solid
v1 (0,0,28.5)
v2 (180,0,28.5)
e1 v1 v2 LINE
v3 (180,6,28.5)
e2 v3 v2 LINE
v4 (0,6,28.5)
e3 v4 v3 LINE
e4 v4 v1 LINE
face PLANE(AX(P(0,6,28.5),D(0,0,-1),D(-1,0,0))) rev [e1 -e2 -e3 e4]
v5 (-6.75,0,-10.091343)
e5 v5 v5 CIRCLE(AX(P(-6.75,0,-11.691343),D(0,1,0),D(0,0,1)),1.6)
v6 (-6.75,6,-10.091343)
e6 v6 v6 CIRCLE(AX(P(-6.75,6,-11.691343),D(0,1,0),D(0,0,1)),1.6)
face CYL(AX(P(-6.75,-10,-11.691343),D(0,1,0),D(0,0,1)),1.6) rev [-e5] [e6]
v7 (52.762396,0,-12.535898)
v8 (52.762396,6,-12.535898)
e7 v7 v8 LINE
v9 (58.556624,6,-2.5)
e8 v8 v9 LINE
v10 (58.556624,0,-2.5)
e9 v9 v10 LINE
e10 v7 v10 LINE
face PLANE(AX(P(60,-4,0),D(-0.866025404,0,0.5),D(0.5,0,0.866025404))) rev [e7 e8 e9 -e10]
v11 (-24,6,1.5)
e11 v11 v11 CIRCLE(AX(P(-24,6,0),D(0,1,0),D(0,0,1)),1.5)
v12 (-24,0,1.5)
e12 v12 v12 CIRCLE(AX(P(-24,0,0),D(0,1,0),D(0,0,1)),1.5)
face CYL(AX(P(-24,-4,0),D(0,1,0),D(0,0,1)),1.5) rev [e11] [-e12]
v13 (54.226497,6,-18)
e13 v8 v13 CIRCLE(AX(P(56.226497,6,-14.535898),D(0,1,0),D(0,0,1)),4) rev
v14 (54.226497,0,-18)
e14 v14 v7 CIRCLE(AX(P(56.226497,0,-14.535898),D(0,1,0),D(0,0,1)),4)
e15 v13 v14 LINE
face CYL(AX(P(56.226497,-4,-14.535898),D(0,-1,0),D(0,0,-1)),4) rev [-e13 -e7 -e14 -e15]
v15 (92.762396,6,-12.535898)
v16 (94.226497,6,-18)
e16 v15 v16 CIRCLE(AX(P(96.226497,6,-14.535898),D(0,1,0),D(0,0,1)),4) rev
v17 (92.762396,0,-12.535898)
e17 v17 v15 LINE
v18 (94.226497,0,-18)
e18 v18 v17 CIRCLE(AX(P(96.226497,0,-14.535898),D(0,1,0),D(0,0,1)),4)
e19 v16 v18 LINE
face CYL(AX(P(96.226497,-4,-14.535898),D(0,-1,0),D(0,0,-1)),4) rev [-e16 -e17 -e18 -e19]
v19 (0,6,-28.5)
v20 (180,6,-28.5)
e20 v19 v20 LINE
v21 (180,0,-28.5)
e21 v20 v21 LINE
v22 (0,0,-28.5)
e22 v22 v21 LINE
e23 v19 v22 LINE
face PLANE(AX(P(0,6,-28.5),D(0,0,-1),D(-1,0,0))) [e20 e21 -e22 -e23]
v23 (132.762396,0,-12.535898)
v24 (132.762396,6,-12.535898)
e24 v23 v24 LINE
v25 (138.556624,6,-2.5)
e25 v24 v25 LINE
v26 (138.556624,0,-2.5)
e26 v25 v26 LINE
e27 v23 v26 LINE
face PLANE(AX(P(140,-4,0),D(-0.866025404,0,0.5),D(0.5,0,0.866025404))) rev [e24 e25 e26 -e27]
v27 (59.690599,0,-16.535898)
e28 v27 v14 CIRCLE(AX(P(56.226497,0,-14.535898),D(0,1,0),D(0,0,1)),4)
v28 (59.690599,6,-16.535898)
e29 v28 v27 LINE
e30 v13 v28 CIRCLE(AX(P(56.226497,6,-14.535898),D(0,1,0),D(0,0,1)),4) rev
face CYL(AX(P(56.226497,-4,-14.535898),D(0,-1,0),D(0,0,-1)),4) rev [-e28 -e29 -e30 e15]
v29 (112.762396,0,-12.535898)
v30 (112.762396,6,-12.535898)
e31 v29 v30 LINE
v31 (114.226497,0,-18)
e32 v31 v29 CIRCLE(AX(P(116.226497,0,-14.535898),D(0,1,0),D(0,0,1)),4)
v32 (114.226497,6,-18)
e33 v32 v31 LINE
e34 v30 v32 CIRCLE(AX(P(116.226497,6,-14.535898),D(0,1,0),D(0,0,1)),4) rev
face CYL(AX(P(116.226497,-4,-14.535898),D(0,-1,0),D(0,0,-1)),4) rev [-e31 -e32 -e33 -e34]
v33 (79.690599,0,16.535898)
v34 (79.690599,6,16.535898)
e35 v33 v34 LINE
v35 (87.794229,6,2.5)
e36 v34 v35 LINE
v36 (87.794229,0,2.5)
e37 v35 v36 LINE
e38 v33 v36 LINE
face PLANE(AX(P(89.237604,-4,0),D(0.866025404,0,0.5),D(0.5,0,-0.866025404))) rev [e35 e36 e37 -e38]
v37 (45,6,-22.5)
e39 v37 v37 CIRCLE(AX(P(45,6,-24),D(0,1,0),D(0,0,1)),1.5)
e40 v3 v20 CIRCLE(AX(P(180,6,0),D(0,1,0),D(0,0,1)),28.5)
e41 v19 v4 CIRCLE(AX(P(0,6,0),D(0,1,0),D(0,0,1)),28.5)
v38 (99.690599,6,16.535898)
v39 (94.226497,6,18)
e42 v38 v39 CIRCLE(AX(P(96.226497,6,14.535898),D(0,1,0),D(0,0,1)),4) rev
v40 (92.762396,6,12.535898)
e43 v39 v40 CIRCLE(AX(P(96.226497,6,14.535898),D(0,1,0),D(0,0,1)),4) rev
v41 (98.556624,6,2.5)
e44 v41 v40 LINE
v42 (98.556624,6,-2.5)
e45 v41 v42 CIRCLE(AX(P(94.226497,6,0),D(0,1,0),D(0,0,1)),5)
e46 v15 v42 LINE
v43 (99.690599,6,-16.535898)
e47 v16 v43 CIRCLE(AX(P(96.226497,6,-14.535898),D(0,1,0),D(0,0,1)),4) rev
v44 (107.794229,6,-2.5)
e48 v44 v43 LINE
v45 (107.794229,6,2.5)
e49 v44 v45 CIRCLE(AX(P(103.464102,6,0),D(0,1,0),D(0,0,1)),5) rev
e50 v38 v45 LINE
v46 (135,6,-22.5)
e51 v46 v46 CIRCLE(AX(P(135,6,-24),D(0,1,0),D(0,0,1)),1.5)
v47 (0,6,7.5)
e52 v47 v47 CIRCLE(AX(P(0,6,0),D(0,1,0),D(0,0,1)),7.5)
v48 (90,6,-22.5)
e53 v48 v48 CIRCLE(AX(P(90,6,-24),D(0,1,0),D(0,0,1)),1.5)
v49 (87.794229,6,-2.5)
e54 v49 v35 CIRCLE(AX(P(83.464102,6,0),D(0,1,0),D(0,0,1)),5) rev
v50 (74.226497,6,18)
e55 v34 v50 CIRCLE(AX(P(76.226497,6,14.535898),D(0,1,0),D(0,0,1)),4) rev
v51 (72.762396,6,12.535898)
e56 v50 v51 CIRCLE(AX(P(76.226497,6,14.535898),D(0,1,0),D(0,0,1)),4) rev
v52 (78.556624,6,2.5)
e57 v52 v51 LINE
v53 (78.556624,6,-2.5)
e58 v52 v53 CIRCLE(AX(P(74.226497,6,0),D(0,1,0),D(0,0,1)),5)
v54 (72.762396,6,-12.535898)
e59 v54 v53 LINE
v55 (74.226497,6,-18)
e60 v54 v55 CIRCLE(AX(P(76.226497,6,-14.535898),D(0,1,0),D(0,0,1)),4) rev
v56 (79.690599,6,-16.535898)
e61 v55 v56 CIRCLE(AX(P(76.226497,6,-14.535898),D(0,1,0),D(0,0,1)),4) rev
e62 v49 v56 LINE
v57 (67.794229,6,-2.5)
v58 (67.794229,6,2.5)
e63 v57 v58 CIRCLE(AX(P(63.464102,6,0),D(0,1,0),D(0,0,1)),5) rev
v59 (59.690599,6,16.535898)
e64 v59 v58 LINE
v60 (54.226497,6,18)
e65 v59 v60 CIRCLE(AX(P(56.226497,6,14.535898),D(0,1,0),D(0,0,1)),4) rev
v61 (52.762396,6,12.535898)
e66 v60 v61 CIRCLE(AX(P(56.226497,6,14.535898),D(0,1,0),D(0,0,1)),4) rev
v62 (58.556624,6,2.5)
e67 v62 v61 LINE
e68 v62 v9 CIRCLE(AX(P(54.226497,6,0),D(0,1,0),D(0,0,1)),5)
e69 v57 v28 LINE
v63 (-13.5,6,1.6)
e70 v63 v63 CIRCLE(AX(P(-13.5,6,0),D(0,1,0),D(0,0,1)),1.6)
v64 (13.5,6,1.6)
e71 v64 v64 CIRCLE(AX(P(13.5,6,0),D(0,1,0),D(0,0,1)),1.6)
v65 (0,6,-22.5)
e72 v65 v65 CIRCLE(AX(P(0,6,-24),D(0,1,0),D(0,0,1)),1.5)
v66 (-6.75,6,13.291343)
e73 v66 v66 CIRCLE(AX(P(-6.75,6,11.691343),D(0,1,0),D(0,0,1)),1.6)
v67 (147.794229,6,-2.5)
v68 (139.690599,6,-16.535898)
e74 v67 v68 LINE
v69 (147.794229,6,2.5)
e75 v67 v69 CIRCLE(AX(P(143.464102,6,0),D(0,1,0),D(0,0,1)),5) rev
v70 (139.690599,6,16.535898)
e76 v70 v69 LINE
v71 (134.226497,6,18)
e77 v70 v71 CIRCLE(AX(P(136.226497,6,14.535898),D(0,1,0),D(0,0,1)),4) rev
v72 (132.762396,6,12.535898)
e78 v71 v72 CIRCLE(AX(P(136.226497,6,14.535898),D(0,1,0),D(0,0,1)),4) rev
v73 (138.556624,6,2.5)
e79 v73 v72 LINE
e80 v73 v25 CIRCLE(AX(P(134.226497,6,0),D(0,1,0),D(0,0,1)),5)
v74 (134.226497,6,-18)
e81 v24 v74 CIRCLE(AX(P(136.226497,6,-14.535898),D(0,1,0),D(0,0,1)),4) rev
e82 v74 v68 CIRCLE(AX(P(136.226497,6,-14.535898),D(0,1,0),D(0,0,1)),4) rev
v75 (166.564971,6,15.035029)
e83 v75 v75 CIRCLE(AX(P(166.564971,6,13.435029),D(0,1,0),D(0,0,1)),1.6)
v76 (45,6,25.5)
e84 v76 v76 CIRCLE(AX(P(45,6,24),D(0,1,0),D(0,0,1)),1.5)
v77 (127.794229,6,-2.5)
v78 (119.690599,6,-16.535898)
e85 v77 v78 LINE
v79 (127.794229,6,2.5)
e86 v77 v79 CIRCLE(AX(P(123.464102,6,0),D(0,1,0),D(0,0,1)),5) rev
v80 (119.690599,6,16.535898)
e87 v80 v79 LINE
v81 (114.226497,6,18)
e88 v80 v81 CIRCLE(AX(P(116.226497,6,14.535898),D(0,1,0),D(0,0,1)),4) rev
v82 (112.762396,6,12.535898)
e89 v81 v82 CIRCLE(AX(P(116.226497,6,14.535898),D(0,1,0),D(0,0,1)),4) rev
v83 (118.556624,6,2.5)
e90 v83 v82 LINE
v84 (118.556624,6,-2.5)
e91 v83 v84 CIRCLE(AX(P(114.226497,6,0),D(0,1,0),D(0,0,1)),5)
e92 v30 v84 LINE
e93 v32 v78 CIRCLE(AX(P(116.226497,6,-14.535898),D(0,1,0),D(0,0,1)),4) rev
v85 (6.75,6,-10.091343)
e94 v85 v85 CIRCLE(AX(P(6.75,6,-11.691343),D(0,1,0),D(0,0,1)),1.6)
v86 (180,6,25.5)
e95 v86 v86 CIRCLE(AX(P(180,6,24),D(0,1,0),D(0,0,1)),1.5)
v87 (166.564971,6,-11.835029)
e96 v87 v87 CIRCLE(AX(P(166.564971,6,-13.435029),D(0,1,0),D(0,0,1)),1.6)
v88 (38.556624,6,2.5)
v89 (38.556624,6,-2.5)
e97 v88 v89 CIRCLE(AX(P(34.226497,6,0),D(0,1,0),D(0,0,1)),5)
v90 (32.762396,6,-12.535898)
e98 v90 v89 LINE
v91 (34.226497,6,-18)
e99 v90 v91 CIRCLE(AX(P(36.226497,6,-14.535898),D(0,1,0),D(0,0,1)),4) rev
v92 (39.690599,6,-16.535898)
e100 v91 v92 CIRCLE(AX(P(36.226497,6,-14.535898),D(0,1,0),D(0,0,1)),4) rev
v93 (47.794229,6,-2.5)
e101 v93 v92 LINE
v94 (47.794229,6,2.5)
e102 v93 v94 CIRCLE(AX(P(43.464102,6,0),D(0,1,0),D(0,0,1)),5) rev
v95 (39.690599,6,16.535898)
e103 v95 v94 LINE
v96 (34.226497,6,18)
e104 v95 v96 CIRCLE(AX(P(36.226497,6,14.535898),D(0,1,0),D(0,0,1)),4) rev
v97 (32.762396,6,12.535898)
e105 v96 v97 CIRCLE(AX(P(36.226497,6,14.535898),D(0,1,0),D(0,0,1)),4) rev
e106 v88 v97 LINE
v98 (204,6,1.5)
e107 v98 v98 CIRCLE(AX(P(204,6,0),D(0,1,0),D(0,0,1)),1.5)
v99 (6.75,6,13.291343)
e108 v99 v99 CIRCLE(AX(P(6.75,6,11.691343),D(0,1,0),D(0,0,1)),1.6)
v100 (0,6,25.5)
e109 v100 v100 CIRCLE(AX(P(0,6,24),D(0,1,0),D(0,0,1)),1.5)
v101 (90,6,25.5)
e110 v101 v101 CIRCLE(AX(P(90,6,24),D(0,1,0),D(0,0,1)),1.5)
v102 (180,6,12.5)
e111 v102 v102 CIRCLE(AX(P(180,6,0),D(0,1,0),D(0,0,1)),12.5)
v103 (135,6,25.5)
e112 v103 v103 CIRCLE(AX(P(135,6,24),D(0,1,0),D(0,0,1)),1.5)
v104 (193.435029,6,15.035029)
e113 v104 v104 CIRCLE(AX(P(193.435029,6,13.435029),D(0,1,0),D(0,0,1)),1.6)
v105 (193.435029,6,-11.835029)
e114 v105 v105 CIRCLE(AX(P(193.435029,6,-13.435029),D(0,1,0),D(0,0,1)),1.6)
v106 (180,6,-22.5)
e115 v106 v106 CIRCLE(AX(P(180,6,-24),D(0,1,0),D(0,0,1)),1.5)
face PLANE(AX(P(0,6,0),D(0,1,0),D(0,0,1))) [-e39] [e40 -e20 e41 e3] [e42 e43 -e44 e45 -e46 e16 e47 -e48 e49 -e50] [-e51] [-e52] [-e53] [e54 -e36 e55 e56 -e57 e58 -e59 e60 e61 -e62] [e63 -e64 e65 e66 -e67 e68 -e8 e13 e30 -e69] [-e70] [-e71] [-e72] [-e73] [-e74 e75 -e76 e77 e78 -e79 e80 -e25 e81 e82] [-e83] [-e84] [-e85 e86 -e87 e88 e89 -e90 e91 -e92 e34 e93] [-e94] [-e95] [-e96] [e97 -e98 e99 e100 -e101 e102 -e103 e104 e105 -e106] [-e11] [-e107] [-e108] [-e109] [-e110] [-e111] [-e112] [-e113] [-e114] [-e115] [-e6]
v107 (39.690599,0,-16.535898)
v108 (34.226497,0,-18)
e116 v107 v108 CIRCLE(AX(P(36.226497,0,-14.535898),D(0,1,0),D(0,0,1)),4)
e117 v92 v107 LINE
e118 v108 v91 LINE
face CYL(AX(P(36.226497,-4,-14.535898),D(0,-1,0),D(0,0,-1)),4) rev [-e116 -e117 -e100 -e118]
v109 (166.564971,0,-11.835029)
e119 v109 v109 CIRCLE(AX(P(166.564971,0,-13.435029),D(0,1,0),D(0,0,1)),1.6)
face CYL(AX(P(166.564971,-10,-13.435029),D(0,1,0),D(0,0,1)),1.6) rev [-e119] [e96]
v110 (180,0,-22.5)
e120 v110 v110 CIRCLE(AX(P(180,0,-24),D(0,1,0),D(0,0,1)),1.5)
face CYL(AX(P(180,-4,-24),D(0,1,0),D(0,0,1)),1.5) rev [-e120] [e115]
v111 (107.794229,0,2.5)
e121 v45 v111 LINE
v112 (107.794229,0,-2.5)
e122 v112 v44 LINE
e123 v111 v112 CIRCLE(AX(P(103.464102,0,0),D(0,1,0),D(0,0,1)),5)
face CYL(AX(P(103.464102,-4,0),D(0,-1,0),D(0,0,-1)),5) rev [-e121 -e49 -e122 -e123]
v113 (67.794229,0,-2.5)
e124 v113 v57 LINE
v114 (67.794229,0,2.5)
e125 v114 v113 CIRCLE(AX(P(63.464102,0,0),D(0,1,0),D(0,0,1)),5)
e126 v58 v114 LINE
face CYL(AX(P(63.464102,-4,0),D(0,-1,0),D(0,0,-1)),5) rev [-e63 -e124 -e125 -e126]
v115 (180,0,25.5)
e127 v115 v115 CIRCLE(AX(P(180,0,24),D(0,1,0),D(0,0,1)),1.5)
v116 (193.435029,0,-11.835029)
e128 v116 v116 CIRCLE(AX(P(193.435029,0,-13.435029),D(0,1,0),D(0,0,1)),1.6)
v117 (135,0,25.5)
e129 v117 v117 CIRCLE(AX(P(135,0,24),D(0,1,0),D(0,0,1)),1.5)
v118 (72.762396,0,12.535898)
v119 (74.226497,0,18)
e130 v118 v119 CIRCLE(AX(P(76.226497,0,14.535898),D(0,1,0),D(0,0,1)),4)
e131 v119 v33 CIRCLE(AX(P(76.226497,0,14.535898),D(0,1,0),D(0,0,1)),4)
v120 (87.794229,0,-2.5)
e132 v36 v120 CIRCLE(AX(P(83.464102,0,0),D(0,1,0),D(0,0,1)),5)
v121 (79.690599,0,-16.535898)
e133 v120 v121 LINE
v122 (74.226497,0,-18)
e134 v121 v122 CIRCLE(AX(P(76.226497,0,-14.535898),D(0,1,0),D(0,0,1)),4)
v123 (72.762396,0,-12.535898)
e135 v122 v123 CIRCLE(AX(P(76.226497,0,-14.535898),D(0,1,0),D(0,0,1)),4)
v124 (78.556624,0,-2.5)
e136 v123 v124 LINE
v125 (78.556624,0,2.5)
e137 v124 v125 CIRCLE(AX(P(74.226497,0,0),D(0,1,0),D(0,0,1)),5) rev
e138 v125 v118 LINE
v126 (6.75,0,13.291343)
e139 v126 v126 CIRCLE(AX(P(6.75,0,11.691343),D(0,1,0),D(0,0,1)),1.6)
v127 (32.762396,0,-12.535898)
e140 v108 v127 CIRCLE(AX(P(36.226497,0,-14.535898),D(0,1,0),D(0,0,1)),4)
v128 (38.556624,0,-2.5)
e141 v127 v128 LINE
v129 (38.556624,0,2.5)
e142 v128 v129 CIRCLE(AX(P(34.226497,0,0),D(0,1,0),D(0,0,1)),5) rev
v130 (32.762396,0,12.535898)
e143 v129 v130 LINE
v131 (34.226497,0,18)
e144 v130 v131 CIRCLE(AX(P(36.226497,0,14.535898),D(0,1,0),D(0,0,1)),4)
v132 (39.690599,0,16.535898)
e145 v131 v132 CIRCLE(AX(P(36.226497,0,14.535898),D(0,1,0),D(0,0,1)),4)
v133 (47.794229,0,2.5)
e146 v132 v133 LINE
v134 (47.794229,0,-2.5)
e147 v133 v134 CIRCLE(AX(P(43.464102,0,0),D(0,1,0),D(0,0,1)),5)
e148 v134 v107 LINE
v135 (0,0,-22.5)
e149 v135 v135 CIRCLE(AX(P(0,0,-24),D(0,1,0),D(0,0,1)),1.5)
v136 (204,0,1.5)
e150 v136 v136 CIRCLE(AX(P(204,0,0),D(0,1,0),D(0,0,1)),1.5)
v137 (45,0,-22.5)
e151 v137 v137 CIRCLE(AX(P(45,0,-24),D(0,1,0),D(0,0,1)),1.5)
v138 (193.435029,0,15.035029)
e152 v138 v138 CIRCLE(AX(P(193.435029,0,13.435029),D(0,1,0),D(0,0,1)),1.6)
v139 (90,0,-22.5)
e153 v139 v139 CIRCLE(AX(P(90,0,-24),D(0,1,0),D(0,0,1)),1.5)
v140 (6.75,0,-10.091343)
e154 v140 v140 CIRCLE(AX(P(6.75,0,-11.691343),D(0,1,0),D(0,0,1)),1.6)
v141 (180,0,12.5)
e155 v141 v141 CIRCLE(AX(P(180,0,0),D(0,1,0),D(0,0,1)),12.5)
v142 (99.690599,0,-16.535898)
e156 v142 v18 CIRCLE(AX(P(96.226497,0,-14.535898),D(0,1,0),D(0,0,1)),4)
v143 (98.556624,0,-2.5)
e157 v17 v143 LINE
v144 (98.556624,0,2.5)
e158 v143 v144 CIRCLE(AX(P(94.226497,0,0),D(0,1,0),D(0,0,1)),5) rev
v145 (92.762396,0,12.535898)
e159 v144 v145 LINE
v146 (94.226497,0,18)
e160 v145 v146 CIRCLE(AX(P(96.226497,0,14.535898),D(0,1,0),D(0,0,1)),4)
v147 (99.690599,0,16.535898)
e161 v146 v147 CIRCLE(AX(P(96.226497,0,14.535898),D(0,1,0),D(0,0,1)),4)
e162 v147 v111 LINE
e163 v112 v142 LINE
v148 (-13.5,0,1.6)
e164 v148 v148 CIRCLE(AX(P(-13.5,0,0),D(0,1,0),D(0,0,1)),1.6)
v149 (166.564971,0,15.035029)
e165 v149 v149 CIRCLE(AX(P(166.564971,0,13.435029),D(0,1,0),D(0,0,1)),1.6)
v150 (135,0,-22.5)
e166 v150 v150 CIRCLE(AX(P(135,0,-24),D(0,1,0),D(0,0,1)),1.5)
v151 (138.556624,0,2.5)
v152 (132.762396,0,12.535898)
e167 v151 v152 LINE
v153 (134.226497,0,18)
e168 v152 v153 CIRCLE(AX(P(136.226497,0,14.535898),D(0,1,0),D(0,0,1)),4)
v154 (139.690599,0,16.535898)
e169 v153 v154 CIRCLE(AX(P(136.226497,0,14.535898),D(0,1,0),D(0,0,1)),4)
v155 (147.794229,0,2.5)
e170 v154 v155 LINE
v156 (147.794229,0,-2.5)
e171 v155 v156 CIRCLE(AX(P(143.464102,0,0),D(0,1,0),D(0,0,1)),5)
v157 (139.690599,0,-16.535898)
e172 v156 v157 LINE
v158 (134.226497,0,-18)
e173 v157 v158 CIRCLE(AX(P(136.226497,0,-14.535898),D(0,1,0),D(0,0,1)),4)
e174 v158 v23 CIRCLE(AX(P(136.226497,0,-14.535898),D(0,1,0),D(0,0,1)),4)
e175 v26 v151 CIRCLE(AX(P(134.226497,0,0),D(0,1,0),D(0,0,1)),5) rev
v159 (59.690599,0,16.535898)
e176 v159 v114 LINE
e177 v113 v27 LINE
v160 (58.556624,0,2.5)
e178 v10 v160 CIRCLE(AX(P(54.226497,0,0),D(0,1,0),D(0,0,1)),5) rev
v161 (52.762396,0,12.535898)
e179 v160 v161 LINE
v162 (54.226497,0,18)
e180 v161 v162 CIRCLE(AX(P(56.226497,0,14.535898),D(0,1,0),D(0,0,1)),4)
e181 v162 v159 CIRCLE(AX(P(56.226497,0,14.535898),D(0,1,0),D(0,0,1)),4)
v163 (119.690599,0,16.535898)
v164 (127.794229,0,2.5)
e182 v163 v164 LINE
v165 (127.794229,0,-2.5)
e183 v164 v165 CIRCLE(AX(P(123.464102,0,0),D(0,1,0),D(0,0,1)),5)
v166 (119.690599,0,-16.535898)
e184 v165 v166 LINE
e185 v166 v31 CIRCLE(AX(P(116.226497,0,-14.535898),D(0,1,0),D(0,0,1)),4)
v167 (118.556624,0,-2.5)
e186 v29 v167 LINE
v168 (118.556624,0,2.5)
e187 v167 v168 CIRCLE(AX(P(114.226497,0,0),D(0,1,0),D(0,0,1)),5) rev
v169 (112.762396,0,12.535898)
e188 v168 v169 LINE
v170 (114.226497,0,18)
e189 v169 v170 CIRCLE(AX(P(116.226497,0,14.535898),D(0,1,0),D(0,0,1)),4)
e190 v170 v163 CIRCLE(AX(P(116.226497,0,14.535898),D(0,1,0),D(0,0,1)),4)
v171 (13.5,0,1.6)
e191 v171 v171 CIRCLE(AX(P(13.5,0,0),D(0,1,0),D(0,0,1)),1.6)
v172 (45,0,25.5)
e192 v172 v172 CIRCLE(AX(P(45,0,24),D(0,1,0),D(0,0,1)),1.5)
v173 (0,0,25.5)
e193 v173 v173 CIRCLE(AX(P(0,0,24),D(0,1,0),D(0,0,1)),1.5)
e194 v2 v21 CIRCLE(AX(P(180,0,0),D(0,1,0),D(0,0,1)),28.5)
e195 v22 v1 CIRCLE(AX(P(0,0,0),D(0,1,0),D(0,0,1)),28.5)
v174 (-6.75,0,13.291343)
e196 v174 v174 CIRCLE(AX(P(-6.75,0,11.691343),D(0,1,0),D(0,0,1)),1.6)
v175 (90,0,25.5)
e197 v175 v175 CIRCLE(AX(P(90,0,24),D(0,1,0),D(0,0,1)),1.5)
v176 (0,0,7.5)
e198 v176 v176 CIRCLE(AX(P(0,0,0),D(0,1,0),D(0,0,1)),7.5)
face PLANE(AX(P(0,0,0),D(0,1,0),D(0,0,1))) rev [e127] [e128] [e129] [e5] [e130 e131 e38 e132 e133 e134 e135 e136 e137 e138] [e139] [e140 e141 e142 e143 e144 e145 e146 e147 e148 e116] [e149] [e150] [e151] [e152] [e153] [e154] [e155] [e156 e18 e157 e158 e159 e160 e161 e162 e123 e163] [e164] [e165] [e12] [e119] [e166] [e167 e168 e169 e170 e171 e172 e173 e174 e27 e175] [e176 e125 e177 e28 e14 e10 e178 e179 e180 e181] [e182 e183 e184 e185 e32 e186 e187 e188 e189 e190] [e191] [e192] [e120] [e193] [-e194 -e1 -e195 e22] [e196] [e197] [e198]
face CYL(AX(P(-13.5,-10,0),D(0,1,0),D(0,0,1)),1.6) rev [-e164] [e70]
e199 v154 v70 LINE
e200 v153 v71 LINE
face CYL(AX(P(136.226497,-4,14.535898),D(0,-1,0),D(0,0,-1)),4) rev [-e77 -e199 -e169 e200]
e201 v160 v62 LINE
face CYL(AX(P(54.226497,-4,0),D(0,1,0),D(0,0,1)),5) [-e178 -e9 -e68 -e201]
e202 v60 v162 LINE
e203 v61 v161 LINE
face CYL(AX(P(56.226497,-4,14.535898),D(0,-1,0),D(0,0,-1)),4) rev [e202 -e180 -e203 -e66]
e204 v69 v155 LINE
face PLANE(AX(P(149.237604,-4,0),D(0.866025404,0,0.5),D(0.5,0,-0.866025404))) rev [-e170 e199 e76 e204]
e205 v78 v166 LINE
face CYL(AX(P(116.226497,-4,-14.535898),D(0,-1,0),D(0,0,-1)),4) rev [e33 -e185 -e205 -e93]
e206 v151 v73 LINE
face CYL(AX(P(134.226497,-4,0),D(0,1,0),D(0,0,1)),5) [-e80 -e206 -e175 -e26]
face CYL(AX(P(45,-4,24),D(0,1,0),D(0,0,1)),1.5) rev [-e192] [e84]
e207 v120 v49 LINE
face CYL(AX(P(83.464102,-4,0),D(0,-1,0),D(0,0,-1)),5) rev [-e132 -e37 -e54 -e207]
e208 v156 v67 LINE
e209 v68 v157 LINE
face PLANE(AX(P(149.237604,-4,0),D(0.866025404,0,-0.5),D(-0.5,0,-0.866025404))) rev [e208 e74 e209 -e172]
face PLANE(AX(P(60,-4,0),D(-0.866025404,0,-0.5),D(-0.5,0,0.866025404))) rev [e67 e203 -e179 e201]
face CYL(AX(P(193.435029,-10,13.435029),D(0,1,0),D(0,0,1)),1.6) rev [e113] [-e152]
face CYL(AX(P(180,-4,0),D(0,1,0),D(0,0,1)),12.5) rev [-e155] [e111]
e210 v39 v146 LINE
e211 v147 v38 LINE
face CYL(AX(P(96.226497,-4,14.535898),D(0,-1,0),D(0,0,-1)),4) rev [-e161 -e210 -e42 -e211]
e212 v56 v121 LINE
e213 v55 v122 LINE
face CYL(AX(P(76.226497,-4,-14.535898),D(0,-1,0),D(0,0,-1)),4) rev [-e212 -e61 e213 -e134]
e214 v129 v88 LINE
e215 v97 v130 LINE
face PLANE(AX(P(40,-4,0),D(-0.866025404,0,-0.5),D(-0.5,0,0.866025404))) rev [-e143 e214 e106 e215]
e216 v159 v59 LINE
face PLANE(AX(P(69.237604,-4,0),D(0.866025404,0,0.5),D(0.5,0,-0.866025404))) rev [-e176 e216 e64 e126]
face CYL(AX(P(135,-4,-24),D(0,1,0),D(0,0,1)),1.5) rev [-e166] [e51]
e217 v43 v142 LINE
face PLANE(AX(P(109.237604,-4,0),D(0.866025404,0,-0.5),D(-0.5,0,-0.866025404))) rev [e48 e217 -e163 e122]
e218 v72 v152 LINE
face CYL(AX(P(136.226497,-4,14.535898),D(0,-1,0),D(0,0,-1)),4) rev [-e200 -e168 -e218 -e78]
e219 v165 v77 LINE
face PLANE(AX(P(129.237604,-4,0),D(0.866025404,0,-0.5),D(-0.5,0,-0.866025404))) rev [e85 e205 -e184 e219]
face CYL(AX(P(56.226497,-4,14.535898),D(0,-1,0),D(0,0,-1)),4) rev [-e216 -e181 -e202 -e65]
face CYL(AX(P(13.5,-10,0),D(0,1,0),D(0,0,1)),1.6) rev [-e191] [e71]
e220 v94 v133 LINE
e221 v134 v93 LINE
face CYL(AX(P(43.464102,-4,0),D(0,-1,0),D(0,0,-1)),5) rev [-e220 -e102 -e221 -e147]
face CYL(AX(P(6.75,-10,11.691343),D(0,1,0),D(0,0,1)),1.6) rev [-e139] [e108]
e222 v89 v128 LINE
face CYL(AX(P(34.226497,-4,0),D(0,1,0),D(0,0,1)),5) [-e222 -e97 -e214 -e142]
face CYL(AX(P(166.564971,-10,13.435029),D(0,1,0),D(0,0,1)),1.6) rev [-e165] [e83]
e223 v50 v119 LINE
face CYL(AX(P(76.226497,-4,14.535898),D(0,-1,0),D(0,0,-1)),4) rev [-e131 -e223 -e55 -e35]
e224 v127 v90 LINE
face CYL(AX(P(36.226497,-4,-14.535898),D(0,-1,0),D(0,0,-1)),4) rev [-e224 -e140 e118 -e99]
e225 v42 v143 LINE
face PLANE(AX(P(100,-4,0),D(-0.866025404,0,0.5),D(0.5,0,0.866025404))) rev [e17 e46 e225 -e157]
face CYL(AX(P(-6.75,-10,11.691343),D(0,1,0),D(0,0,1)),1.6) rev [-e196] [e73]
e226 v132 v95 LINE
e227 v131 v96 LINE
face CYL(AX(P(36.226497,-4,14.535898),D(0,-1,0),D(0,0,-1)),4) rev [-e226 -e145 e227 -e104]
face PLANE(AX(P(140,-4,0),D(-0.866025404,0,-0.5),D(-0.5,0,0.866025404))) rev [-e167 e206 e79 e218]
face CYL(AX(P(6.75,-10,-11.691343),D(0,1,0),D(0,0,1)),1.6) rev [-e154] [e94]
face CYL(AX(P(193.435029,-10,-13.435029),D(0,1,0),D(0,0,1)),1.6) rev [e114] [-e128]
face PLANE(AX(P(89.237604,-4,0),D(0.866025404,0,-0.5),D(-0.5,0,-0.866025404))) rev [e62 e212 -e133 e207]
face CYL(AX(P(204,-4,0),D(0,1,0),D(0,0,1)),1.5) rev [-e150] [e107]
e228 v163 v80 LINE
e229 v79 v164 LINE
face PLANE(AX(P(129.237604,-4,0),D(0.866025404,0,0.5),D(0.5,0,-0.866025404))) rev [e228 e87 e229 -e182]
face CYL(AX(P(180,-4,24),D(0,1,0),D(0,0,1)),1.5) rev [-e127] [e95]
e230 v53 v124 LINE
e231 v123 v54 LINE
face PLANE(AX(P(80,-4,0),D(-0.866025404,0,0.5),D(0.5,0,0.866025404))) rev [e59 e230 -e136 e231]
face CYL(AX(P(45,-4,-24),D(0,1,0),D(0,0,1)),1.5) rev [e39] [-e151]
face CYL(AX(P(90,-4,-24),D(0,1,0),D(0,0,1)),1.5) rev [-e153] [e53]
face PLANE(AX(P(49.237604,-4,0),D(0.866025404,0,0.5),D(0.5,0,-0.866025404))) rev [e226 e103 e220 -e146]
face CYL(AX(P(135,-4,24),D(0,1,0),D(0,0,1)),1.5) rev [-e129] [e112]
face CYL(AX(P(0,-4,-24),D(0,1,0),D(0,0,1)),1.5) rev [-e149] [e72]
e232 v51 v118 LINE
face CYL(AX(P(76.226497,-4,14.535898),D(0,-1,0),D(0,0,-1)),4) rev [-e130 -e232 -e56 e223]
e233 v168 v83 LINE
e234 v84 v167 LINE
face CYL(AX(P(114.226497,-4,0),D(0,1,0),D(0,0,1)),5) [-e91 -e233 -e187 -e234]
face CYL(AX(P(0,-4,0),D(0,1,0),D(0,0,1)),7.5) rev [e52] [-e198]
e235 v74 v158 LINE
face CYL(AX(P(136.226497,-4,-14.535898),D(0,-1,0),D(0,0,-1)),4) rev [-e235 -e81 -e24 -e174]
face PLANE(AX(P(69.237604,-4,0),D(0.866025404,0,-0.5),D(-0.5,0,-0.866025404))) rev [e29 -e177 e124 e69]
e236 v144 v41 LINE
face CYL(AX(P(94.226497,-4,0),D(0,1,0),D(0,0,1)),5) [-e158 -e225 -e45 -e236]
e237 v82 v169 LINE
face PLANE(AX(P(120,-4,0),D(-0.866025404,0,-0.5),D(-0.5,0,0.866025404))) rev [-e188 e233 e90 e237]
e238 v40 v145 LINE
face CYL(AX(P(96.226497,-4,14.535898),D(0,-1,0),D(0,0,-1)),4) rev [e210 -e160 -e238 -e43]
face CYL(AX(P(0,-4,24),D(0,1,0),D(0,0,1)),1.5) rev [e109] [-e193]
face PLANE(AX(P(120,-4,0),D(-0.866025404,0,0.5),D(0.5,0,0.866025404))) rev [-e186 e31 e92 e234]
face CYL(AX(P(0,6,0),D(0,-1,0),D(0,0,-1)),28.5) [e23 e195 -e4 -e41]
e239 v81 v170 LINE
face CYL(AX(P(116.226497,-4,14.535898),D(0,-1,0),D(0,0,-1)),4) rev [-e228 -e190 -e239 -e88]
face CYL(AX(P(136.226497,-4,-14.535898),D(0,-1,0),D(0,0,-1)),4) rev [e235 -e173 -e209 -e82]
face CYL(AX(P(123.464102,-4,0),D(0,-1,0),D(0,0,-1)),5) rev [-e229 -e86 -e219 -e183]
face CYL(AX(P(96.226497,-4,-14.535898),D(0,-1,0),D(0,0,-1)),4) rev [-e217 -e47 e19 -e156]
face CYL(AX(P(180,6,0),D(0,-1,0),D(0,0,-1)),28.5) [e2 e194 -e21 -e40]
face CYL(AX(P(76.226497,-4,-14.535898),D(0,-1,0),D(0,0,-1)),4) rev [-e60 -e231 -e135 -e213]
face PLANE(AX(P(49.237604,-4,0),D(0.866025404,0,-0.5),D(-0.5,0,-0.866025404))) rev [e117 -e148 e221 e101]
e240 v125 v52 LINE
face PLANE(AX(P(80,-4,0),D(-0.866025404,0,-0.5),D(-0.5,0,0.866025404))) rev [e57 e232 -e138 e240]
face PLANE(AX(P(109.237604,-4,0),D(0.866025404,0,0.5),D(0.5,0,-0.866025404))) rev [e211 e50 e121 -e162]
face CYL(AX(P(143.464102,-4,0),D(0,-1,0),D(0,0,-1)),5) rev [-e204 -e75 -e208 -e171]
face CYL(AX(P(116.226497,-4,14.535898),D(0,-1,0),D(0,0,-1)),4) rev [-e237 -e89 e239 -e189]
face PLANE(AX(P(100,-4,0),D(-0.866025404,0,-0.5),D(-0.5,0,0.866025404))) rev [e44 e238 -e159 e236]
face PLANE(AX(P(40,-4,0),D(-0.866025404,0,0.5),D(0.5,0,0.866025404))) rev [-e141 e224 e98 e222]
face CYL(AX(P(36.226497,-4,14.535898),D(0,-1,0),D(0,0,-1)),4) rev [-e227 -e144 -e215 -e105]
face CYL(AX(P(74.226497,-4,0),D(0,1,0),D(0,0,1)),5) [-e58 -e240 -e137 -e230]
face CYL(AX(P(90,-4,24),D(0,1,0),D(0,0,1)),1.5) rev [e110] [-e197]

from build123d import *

# Parameters (mm, degrees)
SKETCH_1_R          = 28.5
EXTRUDE_1_DEPTH     = 6
SKETCH_3_R          = 1.6
CUT_EXTRUDE_1_DEPTH = 16
SKETCH_4_R          = 1.6
CUT_EXTRUDE_2_DEPTH = 16
CUT_EXTRUDE_3_DEPTH = 10
FILLET_2_R          = 5
FILLET_3_R          = 4
SKETCH_7_R          = 7.5
SKETCH_7_R_2        = 12.5
CUT_EXTRUDE_5_DEPTH = 10
SKETCH_6_R          = 1.5
CUT_EXTRUDE_8_DEPTH = 10


with BuildPart() as part:
    # 草图1 → 凸台-拉伸1 (new body)
    with BuildSketch(Plane(origin=(0, 0, 0), x_dir=(1, 0, 0), z_dir=(0, 1, 0))):
        Circle(SKETCH_1_R)
        with BuildLine():
            Line((180, 28.5), (0, 28.5))
            ThreePointArc((0, 28.5), (20.152543264, 20.152543264), (28.5, 0))
            ThreePointArc((28.5, 0), (20.152543264, -20.152543264), (0, -28.5))
            Line((0, -28.5), (180, -28.5))
            ThreePointArc((180, -28.5), (151.5, 0), (180, 28.5))
        make_face()
        with Locations((180, 0)):
            Circle(SKETCH_1_R)
    extrude(amount=EXTRUDE_1_DEPTH)

    # 草图3 → 切除-拉伸1 (cut)
    with BuildSketch(Plane(origin=(0, 6, 0), x_dir=(1, 0, 0), z_dir=(0, 1, 0))):
        with Locations(Location((-13.5, 0, 0), (0, 0, 270))):
            Circle(SKETCH_3_R)
        with Locations(Location((-6.75, 11.691342951, 0), (0, 0, 270))):
            Circle(SKETCH_3_R)
        with Locations(Location((6.75, 11.691342951, 0), (0, 0, 270))):
            Circle(SKETCH_3_R)
        with Locations(Location((13.5, 0, 0), (0, 0, 270))):
            Circle(SKETCH_3_R)
        with Locations(Location((6.75, -11.691342951, 0), (0, 0, 270))):
            Circle(SKETCH_3_R)
        with Locations(Location((-6.75, -11.691342951, 0), (0, 0, 270))):
            Circle(SKETCH_3_R)
    extrude(amount=-CUT_EXTRUDE_1_DEPTH, mode=Mode.SUBTRACT)

    # 草图4 → 切除-拉伸2 (cut)
    with BuildSketch(Plane(origin=(0, 6, 0), x_dir=(1, 0, 0), z_dir=(0, 1, 0))):
        with Locations(Location((193.435028843, 13.435028843, 0), (0, 0, 270))):
            Circle(SKETCH_4_R)
        with Locations(Location((193.435028843, -13.435028843, 0), (0, 0, 270))):
            Circle(SKETCH_4_R)
        with Locations(Location((166.564971157, -13.435028843, 0), (0, 0, 270))):
            Circle(SKETCH_4_R)
        with Locations(Location((166.564971157, 13.435028843, 0), (0, 0, 270))):
            Circle(SKETCH_4_R)
    extrude(amount=-CUT_EXTRUDE_2_DEPTH, mode=Mode.SUBTRACT)

    # 草图5 → 切除-拉伸3 (cut)
    with BuildSketch(Plane(origin=(0, 6, 0), x_dir=(1, 0, 0), z_dir=(0, 1, 0))):
        Polygon((40, 0), (30.762395693, 16), (37.690598923, 20), (49.237604307, 0), (37.690598923, -20), (30.762395693, -16), align=None)
        Polygon((60, 0), (50.762395693, -16), (57.690598923, -20), (69.237604307, 0), (57.690598923, 20), (50.762395693, 16), align=None)
        Polygon((80, 0), (70.762395693, -16), (77.690598923, -20), (89.237604307, 0), (77.690598923, 20), (70.762395693, 16), align=None)
        Polygon((100, 0), (90.762395693, -16), (97.690598923, -20), (109.237604307, 0), (97.690598923, 20), (90.762395693, 16), align=None)
        Polygon((120, 0), (110.762395693, -16), (117.690598923, -20), (129.237604307, 0), (117.690598923, 20), (110.762395693, 16), align=None)
        Polygon((140, 0), (130.762395693, -16), (137.690598923, -20), (149.237604307, 0), (137.690598923, 20), (130.762395693, 16), align=None)
    extrude(amount=-CUT_EXTRUDE_3_DEPTH, mode=Mode.SUBTRACT)

    # 圆角2
    fillet_2_edges = [part.edges().sort_by_distance(p)[0] for p in [
        (40, 3, 0),
        (49.237604307, 3, 0),
        (120, 3, 0),
        (129.237604307, 3, 0),
        (140, 3, 0),
        (149.237604307, 3, 0),
        (60, 3, 0),
        (69.237604307, 3, 0),
        (80, 3, 0),
        (89.237604307, 3, 0),
        (100, 3, 0),
        (109.237604307, 3, 0),
    ]]
    fillet(fillet_2_edges, radius=FILLET_2_R)

    # 圆角3
    fillet_3_edges = [part.edges().sort_by_distance(p)[0] for p in [
        (117.690598923, 3, -20),
        (97.690598923, 3, -20),
        (77.690598923, 3, -20),
        (57.690598923, 3, -20),
        (110.762395693, 3, -16),
        (90.762395693, 3, -16),
        (70.762395693, 3, -16),
        (50.762395693, 3, -16),
        (110.762395693, 3, 16),
        (90.762395693, 3, 16),
        (70.762395693, 3, 16),
        (50.762395693, 3, 16),
        (117.690598923, 3, 20),
        (97.690598923, 3, 20),
        (77.690598923, 3, 20),
        (57.690598923, 3, 20),
        (37.690598923, 3, 20),
        (30.762395693, 3, 16),
        (30.762395693, 3, -16),
        (37.690598923, 3, -20),
        (137.690598923, 3, 20),
        (130.762395693, 3, 16),
        (137.690598923, 3, -20),
        (130.762395693, 3, -16),
    ]]
    fillet(fillet_3_edges, radius=FILLET_3_R - 0.0001)  # a hair under: the kernel refuses the full size

    # 草图7 → 切除-拉伸5 (cut)
    with BuildSketch(Plane(origin=(0, 6, 0), x_dir=(1, 0, 0), z_dir=(0, 1, 0))):
        with Locations(Location((0, 0, 0), (0, 0, 270))):
            Circle(SKETCH_7_R)
        with Locations(Location((180, 0, 0), (0, 0, 270))):
            Circle(SKETCH_7_R_2)
    extrude(amount=-CUT_EXTRUDE_5_DEPTH, mode=Mode.SUBTRACT)

    # 草图6 → 切除-拉伸8 (cut)
    with BuildSketch(Plane(origin=(0, 6, 0), x_dir=(1, 0, 0), z_dir=(0, 1, 0))):
        with Locations(Location((0, 24, 0), (0, 0, 270))):
            Circle(SKETCH_6_R)
        with Locations(Location((-24, 0, 0), (0, 0, 270))):
            Circle(SKETCH_6_R)
        with Locations(Location((0, -24, 0), (0, 0, 270))):
            Circle(SKETCH_6_R)
        with Locations(Location((180, 24, 0), (0, 0, 270))):
            Circle(SKETCH_6_R)
        with Locations(Location((204, 0, 0), (0, 0, 270))):
            Circle(SKETCH_6_R)
        with Locations(Location((180, -24, 0), (0, 0, 270))):
            Circle(SKETCH_6_R)
        with Locations(Location((45, -24, 0), (0, 0, 270))):
            Circle(SKETCH_6_R)
        with Locations(Location((45, 24, 0), (0, 0, 270))):
            Circle(SKETCH_6_R)
        with Locations(Location((90, -24, 0), (0, 0, 270))):
            Circle(SKETCH_6_R)
        with Locations(Location((90, 24, 0), (0, 0, 270))):
            Circle(SKETCH_6_R)
        with Locations(Location((135, -24, 0), (0, 0, 270))):
            Circle(SKETCH_6_R)
        with Locations(Location((135, 24, 0), (0, 0, 270))):
            Circle(SKETCH_6_R)
    extrude(amount=-CUT_EXTRUDE_8_DEPTH, mode=Mode.SUBTRACT)


solid = part.part
